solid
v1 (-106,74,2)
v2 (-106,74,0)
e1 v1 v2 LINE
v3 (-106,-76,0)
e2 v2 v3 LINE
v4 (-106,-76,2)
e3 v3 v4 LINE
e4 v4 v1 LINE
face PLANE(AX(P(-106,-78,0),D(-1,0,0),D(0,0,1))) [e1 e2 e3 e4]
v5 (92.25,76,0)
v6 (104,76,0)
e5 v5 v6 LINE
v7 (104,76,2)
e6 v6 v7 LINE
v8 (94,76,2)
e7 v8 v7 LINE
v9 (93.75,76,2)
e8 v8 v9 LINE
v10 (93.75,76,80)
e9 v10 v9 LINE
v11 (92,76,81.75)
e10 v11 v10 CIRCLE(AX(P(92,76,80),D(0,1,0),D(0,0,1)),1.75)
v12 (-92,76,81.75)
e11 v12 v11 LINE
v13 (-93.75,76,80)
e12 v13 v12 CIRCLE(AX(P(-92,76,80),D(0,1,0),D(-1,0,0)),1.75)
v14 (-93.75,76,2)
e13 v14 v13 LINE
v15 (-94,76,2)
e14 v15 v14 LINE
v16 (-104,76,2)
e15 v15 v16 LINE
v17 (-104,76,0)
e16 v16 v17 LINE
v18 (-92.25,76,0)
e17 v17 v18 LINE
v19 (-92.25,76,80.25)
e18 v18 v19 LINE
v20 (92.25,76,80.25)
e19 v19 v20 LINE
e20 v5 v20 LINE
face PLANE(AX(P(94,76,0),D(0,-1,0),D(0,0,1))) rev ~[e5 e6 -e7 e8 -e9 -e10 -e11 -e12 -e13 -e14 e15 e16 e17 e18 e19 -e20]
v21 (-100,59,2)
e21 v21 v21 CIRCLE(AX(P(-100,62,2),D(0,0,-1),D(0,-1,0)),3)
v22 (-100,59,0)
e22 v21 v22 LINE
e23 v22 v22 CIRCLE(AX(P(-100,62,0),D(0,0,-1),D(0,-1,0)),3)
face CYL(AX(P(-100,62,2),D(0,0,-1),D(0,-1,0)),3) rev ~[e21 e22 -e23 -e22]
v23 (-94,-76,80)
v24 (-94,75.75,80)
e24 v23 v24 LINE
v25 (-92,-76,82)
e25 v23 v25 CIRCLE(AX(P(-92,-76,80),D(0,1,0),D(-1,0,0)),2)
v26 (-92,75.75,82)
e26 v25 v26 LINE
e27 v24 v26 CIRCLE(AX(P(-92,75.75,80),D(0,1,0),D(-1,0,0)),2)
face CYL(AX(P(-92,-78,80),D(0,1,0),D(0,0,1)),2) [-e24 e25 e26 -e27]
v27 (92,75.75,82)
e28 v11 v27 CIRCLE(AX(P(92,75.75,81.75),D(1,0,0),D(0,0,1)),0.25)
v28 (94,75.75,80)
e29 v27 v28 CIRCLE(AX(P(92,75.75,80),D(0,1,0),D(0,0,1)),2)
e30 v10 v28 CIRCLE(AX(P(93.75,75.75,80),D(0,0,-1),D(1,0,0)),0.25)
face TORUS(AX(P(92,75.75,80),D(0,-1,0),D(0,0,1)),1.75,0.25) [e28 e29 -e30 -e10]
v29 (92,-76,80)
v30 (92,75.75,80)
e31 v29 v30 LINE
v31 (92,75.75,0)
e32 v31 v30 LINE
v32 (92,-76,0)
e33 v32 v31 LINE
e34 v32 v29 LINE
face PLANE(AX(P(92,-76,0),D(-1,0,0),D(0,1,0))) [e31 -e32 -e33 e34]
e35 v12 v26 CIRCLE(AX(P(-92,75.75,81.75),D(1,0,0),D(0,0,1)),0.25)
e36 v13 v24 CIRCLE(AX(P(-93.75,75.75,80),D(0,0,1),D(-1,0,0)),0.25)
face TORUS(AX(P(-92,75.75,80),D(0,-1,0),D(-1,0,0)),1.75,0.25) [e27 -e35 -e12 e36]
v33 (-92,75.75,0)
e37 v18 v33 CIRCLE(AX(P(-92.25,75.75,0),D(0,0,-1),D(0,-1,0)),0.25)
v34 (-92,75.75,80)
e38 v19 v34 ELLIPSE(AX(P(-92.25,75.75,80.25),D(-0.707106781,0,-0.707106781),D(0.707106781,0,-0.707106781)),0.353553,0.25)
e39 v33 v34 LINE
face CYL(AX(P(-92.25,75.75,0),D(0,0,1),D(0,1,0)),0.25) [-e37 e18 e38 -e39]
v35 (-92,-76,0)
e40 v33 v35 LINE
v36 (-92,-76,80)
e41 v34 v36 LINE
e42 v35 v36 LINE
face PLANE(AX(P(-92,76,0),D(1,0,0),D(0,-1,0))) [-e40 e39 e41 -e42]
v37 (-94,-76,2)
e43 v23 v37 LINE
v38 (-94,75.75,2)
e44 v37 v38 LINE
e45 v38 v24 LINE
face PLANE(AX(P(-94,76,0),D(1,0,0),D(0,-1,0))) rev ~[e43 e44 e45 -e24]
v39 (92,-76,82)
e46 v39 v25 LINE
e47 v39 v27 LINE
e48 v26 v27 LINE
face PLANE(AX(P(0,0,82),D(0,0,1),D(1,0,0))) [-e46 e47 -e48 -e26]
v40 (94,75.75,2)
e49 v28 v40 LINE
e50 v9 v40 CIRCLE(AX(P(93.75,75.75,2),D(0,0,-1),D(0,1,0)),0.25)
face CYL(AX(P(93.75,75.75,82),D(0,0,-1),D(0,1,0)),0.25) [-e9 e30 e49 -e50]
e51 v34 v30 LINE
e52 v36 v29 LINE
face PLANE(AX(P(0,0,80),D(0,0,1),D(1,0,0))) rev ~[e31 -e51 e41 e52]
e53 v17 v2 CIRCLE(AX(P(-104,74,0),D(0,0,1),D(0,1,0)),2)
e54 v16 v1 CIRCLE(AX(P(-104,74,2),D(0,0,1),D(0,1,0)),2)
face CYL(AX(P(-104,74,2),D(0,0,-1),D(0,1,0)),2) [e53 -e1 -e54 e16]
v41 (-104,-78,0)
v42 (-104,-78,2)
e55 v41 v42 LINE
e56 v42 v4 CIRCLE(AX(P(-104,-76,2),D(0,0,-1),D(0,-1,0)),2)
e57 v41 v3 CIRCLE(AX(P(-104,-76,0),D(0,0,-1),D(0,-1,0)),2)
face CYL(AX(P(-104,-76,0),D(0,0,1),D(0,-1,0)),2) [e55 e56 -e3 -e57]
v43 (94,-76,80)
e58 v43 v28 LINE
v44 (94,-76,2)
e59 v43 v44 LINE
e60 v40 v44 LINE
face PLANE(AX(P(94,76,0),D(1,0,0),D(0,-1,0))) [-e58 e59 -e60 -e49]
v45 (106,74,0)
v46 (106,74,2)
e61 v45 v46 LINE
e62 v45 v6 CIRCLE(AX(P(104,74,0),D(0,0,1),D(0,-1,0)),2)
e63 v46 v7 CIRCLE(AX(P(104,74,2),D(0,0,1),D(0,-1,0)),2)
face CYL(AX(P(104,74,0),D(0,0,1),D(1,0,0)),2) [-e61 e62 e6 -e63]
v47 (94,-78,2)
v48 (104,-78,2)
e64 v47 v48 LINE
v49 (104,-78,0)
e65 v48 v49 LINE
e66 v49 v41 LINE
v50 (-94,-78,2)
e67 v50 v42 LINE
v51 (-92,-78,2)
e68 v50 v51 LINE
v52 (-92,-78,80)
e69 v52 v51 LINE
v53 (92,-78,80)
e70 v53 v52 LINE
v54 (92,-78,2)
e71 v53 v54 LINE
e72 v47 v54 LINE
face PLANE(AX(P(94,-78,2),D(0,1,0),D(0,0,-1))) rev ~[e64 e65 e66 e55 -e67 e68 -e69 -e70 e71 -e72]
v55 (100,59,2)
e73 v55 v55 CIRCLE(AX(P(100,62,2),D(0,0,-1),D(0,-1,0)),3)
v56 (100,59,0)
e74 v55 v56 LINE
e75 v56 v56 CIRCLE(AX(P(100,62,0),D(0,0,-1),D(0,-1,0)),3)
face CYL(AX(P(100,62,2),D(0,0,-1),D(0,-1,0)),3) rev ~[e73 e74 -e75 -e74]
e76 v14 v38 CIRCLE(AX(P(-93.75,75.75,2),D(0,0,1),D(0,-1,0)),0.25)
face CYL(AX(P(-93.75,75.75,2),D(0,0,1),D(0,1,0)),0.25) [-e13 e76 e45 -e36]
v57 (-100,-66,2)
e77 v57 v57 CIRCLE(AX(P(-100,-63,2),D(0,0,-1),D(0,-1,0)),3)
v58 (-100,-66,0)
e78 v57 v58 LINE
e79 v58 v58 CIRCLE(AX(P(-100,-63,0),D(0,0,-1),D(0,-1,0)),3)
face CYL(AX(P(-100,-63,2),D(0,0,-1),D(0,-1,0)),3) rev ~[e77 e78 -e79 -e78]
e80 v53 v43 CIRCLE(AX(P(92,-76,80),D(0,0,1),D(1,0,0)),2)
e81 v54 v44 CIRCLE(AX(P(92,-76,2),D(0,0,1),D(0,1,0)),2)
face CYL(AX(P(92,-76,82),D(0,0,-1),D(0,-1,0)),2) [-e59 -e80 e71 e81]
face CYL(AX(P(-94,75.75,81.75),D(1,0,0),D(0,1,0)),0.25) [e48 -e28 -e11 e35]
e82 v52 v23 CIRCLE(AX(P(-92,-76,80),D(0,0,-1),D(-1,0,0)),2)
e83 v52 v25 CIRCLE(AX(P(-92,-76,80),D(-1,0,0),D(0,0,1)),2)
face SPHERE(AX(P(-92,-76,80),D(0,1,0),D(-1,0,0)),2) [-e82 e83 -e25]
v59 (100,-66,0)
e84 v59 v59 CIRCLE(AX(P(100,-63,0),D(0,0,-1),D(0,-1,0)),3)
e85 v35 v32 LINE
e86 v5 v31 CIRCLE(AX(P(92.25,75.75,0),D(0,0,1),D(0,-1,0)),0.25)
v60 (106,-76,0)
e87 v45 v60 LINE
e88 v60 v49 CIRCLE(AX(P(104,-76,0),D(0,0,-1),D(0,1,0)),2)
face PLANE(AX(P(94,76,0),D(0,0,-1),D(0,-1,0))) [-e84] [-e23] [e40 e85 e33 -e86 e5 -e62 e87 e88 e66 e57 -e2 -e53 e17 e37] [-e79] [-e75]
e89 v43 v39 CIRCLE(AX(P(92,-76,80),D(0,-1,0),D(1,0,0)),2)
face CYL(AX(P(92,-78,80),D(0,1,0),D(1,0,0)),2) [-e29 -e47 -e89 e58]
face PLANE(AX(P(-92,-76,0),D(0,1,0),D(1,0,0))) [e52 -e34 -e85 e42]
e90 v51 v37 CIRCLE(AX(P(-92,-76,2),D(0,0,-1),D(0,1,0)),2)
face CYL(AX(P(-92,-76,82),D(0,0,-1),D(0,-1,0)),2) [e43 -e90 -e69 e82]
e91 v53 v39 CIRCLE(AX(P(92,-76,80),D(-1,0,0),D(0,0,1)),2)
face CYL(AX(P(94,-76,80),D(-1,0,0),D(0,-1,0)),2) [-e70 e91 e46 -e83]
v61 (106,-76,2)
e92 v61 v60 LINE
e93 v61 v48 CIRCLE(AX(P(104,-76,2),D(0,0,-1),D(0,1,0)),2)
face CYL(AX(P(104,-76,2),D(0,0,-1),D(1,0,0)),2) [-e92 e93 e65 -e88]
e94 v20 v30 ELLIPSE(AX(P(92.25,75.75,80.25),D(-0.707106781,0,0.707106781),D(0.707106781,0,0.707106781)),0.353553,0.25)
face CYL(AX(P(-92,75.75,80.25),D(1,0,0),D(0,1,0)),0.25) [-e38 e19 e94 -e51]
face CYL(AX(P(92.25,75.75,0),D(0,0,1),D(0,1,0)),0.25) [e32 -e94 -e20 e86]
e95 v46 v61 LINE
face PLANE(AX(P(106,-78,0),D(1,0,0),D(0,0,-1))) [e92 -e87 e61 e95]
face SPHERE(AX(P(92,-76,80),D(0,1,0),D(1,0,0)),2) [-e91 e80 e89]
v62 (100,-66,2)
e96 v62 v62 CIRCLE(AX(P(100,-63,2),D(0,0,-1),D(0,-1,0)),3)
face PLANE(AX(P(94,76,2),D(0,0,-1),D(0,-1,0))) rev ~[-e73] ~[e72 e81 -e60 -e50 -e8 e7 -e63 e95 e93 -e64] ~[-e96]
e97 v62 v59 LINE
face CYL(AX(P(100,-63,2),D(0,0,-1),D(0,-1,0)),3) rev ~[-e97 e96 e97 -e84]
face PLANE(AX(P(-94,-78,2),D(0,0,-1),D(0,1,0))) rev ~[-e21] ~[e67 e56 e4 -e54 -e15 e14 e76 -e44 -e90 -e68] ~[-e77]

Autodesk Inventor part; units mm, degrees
ref_plane "YZ Plane" through (0, 0, 0) normal (1, 0, 0) x (0, 1, 0)
ref_plane "XZ Plane" through (0, 0, 0) normal (0, 1, 0) x (-1, 0, 0)
ref_plane "XY Plane" through (0, 0, 0) normal (0, 0, 1) x (1, 0, 0)
sketch "Sketch1" plane through (0, 0, 0) normal (0, 0, 1) x (1, 0, 0)
  line L0 (-92, -76) -> (92, -76)
  line L1 (92, -76) -> (92, 76)
  line L2 (92, 76) -> (-92, 76) construction
  line L3 (-92, 76) -> (-92, -76)
  line L4 (-92, -76) -> (92, 76) construction
  line L5 (92, -76) -> (-92, 76) construction
  line L6 (-92, -76) -> (-94, -76) construction
  line L7 (-92, 76) -> (-94, 76) construction
  line L8 (-92, -76) -> (-92, -78) construction
  line L9 (-94, 76) -> (-94, -78)
  line L10 (92, -76) -> (94, -76) construction
  line L11 (92, -76) -> (92, -78) construction
  line L12 (92, 76) -> (94, 76) construction
  line L13 (94, 76) -> (94, -78)
  line L14 (94, -78) -> (-94, -78)
  line L15 (-94, 76) -> (-92, 76)
  line L16 (92, 76) -> (94, 76)
  point P0 (0, 0)
  dimension "d0" = 184
  dimension "d1" = 152
  dimension "d2" = 2
  dimension "d3" = 2
  dimension "d4" = 2
  dimension "d5" = 2
  dimension "d6" = 2
  dimension "d7" = 2
  dimension "d8" = 2
extrude "Extrusion1" add sketch "Sketch1" along normal blind 80
sketch "Sketch2" plane through (0, 0, 80) normal (0, 0, 1) x (1, 0, 0)
  line L0 (92, -76) -> (-92, -76) construction
  line L1 (-92, -76) -> (-92, 76) construction
  line L2 (-92, 76) -> (-94, 76) construction
  line L3 (-94, 76) -> (-94, -78) construction
  line L4 (-94, -78) -> (94, -78) construction
  line L5 (94, -78) -> (94, 76) construction
  line L6 (94, 76) -> (92, 76) construction
  line L7 (92, 76) -> (92, -76) construction
  line L8 (-94, -78) -> (-94, 76) projected
  line L9 (94, -78) -> (94, 76) projected
  line L10 (-94, 76) -> (94, 76)
  line L11 (94, 76) -> (94, -78)
  line L12 (94, -78) -> (-94, -78)
  line L13 (-94, -78) -> (-94, 76)
  point P0 (0, 0)
extrude "Extrusion2" add sketch "Sketch2" along normal blind 2
sketch "Sketch3" plane through (-94, -78, 0) normal (-1, 0, 0) x (0, 0, 1)
  line L0 (0, 0) -> (0, 154) construction
  line L1 (0, 0) -> (82, 0) construction
  line L2 (82, 154) -> (82, 0) construction
  line L3 (0, 154) -> (82, 154) construction
  line L4 (0, 154) -> (80, 154) construction
  line L5 (0, 0) -> (2, 0)
  line L6 (2, 0) -> (2, 154)
  line L7 (2, 154) -> (0, 154)
  line L8 (0, 154) -> (0, 0)
  point P0 (0, 78)
  dimension "d13" = 2
extrude "Extrusion3" add sketch "Sketch3" along normal blind 12
sketch "Sketch4" plane through (94, -78, 0) normal (1, 0, 0) x (0, 0, -1)
  line L0 (0, 154) -> (0, 0) construction
  line L1 (0, 154) -> (-82, 154) construction
  line L2 (-82, 0) -> (-82, 154) construction
  line L3 (0, 0) -> (-82, 0) construction
  line L4 (0, 154) -> (0, 2) projected
  line L5 (-2, 0) -> (-82, 0) construction
  line L6 (0, 154) -> (-2, 154)
  line L7 (-2, 154) -> (-2, 0)
  line L8 (-2, 0) -> (0, 0)
  line L9 (0, 0) -> (0, 154)
  point P0 (0, 78)
extrude "Extrusion4" add sketch "Sketch4" along normal blind 12
sketch "Sketch5" plane through (-94, -78, 2) normal (0, 0, 1) x (1, 0, 0)
  circle A0 centre (-6, 15) radius 3 construction
  line L0 (0, 154) -> (0, 0) construction
  line L1 (0, 154) -> (-12, 154) construction
  line L2 (-12, 0) -> (-12, 154) construction
  line L3 (0, 0) -> (-12, 0) construction
  circle A1 centre (-6, 140) radius 3 construction
  line L4 (188, 154) -> (0, 154) construction
  line L5 (0, 154) -> (0, 0) construction
  line L6 (0, 0) -> (188, 0) construction
  line L7 (188, 0) -> (188, 154) construction
  line L8 (188, 154) -> (0, 154) construction
  line L9 (94, 154) -> (94, 2) construction
  line L10 (2, 2) -> (186, 2) construction
  circle A2 centre (194, 15) radius 3 construction
  circle A3 centre (194, 140) radius 3 construction
  point P0 (94, 78)
  dimension "d18" = 6
  dimension "d19" = 15
  dimension "d23" = 6
  dimension "d24" = 125
  dimension "d25" = 100
hole "Hole1" at (-100, 62, 2) at (-100, -63, 2) at (100, -63, 2) at (100, 62, 2) direction (0, 0, -1) diameter 6 end through all
fillet "Fillet1" radius 2 9 edges at (-106, 76, 1) (-106, -78, 1) (106, -78, 1) (106, 76, 1) (94, -1, 82) (-94, -1, 82) (-94, -78, 42) (94, -78, 42) (0, -78, 82)
fillet "Fillet1" radius 0.25 6 edges at (0, 76, 80) (92, 76, 40) (-92, 76, 40) (-94, 76, 42) (0, 76, 82) (94, 76, 42)
properties part number "BatteryBox_NP1812" material "Steel, Galvanized"
